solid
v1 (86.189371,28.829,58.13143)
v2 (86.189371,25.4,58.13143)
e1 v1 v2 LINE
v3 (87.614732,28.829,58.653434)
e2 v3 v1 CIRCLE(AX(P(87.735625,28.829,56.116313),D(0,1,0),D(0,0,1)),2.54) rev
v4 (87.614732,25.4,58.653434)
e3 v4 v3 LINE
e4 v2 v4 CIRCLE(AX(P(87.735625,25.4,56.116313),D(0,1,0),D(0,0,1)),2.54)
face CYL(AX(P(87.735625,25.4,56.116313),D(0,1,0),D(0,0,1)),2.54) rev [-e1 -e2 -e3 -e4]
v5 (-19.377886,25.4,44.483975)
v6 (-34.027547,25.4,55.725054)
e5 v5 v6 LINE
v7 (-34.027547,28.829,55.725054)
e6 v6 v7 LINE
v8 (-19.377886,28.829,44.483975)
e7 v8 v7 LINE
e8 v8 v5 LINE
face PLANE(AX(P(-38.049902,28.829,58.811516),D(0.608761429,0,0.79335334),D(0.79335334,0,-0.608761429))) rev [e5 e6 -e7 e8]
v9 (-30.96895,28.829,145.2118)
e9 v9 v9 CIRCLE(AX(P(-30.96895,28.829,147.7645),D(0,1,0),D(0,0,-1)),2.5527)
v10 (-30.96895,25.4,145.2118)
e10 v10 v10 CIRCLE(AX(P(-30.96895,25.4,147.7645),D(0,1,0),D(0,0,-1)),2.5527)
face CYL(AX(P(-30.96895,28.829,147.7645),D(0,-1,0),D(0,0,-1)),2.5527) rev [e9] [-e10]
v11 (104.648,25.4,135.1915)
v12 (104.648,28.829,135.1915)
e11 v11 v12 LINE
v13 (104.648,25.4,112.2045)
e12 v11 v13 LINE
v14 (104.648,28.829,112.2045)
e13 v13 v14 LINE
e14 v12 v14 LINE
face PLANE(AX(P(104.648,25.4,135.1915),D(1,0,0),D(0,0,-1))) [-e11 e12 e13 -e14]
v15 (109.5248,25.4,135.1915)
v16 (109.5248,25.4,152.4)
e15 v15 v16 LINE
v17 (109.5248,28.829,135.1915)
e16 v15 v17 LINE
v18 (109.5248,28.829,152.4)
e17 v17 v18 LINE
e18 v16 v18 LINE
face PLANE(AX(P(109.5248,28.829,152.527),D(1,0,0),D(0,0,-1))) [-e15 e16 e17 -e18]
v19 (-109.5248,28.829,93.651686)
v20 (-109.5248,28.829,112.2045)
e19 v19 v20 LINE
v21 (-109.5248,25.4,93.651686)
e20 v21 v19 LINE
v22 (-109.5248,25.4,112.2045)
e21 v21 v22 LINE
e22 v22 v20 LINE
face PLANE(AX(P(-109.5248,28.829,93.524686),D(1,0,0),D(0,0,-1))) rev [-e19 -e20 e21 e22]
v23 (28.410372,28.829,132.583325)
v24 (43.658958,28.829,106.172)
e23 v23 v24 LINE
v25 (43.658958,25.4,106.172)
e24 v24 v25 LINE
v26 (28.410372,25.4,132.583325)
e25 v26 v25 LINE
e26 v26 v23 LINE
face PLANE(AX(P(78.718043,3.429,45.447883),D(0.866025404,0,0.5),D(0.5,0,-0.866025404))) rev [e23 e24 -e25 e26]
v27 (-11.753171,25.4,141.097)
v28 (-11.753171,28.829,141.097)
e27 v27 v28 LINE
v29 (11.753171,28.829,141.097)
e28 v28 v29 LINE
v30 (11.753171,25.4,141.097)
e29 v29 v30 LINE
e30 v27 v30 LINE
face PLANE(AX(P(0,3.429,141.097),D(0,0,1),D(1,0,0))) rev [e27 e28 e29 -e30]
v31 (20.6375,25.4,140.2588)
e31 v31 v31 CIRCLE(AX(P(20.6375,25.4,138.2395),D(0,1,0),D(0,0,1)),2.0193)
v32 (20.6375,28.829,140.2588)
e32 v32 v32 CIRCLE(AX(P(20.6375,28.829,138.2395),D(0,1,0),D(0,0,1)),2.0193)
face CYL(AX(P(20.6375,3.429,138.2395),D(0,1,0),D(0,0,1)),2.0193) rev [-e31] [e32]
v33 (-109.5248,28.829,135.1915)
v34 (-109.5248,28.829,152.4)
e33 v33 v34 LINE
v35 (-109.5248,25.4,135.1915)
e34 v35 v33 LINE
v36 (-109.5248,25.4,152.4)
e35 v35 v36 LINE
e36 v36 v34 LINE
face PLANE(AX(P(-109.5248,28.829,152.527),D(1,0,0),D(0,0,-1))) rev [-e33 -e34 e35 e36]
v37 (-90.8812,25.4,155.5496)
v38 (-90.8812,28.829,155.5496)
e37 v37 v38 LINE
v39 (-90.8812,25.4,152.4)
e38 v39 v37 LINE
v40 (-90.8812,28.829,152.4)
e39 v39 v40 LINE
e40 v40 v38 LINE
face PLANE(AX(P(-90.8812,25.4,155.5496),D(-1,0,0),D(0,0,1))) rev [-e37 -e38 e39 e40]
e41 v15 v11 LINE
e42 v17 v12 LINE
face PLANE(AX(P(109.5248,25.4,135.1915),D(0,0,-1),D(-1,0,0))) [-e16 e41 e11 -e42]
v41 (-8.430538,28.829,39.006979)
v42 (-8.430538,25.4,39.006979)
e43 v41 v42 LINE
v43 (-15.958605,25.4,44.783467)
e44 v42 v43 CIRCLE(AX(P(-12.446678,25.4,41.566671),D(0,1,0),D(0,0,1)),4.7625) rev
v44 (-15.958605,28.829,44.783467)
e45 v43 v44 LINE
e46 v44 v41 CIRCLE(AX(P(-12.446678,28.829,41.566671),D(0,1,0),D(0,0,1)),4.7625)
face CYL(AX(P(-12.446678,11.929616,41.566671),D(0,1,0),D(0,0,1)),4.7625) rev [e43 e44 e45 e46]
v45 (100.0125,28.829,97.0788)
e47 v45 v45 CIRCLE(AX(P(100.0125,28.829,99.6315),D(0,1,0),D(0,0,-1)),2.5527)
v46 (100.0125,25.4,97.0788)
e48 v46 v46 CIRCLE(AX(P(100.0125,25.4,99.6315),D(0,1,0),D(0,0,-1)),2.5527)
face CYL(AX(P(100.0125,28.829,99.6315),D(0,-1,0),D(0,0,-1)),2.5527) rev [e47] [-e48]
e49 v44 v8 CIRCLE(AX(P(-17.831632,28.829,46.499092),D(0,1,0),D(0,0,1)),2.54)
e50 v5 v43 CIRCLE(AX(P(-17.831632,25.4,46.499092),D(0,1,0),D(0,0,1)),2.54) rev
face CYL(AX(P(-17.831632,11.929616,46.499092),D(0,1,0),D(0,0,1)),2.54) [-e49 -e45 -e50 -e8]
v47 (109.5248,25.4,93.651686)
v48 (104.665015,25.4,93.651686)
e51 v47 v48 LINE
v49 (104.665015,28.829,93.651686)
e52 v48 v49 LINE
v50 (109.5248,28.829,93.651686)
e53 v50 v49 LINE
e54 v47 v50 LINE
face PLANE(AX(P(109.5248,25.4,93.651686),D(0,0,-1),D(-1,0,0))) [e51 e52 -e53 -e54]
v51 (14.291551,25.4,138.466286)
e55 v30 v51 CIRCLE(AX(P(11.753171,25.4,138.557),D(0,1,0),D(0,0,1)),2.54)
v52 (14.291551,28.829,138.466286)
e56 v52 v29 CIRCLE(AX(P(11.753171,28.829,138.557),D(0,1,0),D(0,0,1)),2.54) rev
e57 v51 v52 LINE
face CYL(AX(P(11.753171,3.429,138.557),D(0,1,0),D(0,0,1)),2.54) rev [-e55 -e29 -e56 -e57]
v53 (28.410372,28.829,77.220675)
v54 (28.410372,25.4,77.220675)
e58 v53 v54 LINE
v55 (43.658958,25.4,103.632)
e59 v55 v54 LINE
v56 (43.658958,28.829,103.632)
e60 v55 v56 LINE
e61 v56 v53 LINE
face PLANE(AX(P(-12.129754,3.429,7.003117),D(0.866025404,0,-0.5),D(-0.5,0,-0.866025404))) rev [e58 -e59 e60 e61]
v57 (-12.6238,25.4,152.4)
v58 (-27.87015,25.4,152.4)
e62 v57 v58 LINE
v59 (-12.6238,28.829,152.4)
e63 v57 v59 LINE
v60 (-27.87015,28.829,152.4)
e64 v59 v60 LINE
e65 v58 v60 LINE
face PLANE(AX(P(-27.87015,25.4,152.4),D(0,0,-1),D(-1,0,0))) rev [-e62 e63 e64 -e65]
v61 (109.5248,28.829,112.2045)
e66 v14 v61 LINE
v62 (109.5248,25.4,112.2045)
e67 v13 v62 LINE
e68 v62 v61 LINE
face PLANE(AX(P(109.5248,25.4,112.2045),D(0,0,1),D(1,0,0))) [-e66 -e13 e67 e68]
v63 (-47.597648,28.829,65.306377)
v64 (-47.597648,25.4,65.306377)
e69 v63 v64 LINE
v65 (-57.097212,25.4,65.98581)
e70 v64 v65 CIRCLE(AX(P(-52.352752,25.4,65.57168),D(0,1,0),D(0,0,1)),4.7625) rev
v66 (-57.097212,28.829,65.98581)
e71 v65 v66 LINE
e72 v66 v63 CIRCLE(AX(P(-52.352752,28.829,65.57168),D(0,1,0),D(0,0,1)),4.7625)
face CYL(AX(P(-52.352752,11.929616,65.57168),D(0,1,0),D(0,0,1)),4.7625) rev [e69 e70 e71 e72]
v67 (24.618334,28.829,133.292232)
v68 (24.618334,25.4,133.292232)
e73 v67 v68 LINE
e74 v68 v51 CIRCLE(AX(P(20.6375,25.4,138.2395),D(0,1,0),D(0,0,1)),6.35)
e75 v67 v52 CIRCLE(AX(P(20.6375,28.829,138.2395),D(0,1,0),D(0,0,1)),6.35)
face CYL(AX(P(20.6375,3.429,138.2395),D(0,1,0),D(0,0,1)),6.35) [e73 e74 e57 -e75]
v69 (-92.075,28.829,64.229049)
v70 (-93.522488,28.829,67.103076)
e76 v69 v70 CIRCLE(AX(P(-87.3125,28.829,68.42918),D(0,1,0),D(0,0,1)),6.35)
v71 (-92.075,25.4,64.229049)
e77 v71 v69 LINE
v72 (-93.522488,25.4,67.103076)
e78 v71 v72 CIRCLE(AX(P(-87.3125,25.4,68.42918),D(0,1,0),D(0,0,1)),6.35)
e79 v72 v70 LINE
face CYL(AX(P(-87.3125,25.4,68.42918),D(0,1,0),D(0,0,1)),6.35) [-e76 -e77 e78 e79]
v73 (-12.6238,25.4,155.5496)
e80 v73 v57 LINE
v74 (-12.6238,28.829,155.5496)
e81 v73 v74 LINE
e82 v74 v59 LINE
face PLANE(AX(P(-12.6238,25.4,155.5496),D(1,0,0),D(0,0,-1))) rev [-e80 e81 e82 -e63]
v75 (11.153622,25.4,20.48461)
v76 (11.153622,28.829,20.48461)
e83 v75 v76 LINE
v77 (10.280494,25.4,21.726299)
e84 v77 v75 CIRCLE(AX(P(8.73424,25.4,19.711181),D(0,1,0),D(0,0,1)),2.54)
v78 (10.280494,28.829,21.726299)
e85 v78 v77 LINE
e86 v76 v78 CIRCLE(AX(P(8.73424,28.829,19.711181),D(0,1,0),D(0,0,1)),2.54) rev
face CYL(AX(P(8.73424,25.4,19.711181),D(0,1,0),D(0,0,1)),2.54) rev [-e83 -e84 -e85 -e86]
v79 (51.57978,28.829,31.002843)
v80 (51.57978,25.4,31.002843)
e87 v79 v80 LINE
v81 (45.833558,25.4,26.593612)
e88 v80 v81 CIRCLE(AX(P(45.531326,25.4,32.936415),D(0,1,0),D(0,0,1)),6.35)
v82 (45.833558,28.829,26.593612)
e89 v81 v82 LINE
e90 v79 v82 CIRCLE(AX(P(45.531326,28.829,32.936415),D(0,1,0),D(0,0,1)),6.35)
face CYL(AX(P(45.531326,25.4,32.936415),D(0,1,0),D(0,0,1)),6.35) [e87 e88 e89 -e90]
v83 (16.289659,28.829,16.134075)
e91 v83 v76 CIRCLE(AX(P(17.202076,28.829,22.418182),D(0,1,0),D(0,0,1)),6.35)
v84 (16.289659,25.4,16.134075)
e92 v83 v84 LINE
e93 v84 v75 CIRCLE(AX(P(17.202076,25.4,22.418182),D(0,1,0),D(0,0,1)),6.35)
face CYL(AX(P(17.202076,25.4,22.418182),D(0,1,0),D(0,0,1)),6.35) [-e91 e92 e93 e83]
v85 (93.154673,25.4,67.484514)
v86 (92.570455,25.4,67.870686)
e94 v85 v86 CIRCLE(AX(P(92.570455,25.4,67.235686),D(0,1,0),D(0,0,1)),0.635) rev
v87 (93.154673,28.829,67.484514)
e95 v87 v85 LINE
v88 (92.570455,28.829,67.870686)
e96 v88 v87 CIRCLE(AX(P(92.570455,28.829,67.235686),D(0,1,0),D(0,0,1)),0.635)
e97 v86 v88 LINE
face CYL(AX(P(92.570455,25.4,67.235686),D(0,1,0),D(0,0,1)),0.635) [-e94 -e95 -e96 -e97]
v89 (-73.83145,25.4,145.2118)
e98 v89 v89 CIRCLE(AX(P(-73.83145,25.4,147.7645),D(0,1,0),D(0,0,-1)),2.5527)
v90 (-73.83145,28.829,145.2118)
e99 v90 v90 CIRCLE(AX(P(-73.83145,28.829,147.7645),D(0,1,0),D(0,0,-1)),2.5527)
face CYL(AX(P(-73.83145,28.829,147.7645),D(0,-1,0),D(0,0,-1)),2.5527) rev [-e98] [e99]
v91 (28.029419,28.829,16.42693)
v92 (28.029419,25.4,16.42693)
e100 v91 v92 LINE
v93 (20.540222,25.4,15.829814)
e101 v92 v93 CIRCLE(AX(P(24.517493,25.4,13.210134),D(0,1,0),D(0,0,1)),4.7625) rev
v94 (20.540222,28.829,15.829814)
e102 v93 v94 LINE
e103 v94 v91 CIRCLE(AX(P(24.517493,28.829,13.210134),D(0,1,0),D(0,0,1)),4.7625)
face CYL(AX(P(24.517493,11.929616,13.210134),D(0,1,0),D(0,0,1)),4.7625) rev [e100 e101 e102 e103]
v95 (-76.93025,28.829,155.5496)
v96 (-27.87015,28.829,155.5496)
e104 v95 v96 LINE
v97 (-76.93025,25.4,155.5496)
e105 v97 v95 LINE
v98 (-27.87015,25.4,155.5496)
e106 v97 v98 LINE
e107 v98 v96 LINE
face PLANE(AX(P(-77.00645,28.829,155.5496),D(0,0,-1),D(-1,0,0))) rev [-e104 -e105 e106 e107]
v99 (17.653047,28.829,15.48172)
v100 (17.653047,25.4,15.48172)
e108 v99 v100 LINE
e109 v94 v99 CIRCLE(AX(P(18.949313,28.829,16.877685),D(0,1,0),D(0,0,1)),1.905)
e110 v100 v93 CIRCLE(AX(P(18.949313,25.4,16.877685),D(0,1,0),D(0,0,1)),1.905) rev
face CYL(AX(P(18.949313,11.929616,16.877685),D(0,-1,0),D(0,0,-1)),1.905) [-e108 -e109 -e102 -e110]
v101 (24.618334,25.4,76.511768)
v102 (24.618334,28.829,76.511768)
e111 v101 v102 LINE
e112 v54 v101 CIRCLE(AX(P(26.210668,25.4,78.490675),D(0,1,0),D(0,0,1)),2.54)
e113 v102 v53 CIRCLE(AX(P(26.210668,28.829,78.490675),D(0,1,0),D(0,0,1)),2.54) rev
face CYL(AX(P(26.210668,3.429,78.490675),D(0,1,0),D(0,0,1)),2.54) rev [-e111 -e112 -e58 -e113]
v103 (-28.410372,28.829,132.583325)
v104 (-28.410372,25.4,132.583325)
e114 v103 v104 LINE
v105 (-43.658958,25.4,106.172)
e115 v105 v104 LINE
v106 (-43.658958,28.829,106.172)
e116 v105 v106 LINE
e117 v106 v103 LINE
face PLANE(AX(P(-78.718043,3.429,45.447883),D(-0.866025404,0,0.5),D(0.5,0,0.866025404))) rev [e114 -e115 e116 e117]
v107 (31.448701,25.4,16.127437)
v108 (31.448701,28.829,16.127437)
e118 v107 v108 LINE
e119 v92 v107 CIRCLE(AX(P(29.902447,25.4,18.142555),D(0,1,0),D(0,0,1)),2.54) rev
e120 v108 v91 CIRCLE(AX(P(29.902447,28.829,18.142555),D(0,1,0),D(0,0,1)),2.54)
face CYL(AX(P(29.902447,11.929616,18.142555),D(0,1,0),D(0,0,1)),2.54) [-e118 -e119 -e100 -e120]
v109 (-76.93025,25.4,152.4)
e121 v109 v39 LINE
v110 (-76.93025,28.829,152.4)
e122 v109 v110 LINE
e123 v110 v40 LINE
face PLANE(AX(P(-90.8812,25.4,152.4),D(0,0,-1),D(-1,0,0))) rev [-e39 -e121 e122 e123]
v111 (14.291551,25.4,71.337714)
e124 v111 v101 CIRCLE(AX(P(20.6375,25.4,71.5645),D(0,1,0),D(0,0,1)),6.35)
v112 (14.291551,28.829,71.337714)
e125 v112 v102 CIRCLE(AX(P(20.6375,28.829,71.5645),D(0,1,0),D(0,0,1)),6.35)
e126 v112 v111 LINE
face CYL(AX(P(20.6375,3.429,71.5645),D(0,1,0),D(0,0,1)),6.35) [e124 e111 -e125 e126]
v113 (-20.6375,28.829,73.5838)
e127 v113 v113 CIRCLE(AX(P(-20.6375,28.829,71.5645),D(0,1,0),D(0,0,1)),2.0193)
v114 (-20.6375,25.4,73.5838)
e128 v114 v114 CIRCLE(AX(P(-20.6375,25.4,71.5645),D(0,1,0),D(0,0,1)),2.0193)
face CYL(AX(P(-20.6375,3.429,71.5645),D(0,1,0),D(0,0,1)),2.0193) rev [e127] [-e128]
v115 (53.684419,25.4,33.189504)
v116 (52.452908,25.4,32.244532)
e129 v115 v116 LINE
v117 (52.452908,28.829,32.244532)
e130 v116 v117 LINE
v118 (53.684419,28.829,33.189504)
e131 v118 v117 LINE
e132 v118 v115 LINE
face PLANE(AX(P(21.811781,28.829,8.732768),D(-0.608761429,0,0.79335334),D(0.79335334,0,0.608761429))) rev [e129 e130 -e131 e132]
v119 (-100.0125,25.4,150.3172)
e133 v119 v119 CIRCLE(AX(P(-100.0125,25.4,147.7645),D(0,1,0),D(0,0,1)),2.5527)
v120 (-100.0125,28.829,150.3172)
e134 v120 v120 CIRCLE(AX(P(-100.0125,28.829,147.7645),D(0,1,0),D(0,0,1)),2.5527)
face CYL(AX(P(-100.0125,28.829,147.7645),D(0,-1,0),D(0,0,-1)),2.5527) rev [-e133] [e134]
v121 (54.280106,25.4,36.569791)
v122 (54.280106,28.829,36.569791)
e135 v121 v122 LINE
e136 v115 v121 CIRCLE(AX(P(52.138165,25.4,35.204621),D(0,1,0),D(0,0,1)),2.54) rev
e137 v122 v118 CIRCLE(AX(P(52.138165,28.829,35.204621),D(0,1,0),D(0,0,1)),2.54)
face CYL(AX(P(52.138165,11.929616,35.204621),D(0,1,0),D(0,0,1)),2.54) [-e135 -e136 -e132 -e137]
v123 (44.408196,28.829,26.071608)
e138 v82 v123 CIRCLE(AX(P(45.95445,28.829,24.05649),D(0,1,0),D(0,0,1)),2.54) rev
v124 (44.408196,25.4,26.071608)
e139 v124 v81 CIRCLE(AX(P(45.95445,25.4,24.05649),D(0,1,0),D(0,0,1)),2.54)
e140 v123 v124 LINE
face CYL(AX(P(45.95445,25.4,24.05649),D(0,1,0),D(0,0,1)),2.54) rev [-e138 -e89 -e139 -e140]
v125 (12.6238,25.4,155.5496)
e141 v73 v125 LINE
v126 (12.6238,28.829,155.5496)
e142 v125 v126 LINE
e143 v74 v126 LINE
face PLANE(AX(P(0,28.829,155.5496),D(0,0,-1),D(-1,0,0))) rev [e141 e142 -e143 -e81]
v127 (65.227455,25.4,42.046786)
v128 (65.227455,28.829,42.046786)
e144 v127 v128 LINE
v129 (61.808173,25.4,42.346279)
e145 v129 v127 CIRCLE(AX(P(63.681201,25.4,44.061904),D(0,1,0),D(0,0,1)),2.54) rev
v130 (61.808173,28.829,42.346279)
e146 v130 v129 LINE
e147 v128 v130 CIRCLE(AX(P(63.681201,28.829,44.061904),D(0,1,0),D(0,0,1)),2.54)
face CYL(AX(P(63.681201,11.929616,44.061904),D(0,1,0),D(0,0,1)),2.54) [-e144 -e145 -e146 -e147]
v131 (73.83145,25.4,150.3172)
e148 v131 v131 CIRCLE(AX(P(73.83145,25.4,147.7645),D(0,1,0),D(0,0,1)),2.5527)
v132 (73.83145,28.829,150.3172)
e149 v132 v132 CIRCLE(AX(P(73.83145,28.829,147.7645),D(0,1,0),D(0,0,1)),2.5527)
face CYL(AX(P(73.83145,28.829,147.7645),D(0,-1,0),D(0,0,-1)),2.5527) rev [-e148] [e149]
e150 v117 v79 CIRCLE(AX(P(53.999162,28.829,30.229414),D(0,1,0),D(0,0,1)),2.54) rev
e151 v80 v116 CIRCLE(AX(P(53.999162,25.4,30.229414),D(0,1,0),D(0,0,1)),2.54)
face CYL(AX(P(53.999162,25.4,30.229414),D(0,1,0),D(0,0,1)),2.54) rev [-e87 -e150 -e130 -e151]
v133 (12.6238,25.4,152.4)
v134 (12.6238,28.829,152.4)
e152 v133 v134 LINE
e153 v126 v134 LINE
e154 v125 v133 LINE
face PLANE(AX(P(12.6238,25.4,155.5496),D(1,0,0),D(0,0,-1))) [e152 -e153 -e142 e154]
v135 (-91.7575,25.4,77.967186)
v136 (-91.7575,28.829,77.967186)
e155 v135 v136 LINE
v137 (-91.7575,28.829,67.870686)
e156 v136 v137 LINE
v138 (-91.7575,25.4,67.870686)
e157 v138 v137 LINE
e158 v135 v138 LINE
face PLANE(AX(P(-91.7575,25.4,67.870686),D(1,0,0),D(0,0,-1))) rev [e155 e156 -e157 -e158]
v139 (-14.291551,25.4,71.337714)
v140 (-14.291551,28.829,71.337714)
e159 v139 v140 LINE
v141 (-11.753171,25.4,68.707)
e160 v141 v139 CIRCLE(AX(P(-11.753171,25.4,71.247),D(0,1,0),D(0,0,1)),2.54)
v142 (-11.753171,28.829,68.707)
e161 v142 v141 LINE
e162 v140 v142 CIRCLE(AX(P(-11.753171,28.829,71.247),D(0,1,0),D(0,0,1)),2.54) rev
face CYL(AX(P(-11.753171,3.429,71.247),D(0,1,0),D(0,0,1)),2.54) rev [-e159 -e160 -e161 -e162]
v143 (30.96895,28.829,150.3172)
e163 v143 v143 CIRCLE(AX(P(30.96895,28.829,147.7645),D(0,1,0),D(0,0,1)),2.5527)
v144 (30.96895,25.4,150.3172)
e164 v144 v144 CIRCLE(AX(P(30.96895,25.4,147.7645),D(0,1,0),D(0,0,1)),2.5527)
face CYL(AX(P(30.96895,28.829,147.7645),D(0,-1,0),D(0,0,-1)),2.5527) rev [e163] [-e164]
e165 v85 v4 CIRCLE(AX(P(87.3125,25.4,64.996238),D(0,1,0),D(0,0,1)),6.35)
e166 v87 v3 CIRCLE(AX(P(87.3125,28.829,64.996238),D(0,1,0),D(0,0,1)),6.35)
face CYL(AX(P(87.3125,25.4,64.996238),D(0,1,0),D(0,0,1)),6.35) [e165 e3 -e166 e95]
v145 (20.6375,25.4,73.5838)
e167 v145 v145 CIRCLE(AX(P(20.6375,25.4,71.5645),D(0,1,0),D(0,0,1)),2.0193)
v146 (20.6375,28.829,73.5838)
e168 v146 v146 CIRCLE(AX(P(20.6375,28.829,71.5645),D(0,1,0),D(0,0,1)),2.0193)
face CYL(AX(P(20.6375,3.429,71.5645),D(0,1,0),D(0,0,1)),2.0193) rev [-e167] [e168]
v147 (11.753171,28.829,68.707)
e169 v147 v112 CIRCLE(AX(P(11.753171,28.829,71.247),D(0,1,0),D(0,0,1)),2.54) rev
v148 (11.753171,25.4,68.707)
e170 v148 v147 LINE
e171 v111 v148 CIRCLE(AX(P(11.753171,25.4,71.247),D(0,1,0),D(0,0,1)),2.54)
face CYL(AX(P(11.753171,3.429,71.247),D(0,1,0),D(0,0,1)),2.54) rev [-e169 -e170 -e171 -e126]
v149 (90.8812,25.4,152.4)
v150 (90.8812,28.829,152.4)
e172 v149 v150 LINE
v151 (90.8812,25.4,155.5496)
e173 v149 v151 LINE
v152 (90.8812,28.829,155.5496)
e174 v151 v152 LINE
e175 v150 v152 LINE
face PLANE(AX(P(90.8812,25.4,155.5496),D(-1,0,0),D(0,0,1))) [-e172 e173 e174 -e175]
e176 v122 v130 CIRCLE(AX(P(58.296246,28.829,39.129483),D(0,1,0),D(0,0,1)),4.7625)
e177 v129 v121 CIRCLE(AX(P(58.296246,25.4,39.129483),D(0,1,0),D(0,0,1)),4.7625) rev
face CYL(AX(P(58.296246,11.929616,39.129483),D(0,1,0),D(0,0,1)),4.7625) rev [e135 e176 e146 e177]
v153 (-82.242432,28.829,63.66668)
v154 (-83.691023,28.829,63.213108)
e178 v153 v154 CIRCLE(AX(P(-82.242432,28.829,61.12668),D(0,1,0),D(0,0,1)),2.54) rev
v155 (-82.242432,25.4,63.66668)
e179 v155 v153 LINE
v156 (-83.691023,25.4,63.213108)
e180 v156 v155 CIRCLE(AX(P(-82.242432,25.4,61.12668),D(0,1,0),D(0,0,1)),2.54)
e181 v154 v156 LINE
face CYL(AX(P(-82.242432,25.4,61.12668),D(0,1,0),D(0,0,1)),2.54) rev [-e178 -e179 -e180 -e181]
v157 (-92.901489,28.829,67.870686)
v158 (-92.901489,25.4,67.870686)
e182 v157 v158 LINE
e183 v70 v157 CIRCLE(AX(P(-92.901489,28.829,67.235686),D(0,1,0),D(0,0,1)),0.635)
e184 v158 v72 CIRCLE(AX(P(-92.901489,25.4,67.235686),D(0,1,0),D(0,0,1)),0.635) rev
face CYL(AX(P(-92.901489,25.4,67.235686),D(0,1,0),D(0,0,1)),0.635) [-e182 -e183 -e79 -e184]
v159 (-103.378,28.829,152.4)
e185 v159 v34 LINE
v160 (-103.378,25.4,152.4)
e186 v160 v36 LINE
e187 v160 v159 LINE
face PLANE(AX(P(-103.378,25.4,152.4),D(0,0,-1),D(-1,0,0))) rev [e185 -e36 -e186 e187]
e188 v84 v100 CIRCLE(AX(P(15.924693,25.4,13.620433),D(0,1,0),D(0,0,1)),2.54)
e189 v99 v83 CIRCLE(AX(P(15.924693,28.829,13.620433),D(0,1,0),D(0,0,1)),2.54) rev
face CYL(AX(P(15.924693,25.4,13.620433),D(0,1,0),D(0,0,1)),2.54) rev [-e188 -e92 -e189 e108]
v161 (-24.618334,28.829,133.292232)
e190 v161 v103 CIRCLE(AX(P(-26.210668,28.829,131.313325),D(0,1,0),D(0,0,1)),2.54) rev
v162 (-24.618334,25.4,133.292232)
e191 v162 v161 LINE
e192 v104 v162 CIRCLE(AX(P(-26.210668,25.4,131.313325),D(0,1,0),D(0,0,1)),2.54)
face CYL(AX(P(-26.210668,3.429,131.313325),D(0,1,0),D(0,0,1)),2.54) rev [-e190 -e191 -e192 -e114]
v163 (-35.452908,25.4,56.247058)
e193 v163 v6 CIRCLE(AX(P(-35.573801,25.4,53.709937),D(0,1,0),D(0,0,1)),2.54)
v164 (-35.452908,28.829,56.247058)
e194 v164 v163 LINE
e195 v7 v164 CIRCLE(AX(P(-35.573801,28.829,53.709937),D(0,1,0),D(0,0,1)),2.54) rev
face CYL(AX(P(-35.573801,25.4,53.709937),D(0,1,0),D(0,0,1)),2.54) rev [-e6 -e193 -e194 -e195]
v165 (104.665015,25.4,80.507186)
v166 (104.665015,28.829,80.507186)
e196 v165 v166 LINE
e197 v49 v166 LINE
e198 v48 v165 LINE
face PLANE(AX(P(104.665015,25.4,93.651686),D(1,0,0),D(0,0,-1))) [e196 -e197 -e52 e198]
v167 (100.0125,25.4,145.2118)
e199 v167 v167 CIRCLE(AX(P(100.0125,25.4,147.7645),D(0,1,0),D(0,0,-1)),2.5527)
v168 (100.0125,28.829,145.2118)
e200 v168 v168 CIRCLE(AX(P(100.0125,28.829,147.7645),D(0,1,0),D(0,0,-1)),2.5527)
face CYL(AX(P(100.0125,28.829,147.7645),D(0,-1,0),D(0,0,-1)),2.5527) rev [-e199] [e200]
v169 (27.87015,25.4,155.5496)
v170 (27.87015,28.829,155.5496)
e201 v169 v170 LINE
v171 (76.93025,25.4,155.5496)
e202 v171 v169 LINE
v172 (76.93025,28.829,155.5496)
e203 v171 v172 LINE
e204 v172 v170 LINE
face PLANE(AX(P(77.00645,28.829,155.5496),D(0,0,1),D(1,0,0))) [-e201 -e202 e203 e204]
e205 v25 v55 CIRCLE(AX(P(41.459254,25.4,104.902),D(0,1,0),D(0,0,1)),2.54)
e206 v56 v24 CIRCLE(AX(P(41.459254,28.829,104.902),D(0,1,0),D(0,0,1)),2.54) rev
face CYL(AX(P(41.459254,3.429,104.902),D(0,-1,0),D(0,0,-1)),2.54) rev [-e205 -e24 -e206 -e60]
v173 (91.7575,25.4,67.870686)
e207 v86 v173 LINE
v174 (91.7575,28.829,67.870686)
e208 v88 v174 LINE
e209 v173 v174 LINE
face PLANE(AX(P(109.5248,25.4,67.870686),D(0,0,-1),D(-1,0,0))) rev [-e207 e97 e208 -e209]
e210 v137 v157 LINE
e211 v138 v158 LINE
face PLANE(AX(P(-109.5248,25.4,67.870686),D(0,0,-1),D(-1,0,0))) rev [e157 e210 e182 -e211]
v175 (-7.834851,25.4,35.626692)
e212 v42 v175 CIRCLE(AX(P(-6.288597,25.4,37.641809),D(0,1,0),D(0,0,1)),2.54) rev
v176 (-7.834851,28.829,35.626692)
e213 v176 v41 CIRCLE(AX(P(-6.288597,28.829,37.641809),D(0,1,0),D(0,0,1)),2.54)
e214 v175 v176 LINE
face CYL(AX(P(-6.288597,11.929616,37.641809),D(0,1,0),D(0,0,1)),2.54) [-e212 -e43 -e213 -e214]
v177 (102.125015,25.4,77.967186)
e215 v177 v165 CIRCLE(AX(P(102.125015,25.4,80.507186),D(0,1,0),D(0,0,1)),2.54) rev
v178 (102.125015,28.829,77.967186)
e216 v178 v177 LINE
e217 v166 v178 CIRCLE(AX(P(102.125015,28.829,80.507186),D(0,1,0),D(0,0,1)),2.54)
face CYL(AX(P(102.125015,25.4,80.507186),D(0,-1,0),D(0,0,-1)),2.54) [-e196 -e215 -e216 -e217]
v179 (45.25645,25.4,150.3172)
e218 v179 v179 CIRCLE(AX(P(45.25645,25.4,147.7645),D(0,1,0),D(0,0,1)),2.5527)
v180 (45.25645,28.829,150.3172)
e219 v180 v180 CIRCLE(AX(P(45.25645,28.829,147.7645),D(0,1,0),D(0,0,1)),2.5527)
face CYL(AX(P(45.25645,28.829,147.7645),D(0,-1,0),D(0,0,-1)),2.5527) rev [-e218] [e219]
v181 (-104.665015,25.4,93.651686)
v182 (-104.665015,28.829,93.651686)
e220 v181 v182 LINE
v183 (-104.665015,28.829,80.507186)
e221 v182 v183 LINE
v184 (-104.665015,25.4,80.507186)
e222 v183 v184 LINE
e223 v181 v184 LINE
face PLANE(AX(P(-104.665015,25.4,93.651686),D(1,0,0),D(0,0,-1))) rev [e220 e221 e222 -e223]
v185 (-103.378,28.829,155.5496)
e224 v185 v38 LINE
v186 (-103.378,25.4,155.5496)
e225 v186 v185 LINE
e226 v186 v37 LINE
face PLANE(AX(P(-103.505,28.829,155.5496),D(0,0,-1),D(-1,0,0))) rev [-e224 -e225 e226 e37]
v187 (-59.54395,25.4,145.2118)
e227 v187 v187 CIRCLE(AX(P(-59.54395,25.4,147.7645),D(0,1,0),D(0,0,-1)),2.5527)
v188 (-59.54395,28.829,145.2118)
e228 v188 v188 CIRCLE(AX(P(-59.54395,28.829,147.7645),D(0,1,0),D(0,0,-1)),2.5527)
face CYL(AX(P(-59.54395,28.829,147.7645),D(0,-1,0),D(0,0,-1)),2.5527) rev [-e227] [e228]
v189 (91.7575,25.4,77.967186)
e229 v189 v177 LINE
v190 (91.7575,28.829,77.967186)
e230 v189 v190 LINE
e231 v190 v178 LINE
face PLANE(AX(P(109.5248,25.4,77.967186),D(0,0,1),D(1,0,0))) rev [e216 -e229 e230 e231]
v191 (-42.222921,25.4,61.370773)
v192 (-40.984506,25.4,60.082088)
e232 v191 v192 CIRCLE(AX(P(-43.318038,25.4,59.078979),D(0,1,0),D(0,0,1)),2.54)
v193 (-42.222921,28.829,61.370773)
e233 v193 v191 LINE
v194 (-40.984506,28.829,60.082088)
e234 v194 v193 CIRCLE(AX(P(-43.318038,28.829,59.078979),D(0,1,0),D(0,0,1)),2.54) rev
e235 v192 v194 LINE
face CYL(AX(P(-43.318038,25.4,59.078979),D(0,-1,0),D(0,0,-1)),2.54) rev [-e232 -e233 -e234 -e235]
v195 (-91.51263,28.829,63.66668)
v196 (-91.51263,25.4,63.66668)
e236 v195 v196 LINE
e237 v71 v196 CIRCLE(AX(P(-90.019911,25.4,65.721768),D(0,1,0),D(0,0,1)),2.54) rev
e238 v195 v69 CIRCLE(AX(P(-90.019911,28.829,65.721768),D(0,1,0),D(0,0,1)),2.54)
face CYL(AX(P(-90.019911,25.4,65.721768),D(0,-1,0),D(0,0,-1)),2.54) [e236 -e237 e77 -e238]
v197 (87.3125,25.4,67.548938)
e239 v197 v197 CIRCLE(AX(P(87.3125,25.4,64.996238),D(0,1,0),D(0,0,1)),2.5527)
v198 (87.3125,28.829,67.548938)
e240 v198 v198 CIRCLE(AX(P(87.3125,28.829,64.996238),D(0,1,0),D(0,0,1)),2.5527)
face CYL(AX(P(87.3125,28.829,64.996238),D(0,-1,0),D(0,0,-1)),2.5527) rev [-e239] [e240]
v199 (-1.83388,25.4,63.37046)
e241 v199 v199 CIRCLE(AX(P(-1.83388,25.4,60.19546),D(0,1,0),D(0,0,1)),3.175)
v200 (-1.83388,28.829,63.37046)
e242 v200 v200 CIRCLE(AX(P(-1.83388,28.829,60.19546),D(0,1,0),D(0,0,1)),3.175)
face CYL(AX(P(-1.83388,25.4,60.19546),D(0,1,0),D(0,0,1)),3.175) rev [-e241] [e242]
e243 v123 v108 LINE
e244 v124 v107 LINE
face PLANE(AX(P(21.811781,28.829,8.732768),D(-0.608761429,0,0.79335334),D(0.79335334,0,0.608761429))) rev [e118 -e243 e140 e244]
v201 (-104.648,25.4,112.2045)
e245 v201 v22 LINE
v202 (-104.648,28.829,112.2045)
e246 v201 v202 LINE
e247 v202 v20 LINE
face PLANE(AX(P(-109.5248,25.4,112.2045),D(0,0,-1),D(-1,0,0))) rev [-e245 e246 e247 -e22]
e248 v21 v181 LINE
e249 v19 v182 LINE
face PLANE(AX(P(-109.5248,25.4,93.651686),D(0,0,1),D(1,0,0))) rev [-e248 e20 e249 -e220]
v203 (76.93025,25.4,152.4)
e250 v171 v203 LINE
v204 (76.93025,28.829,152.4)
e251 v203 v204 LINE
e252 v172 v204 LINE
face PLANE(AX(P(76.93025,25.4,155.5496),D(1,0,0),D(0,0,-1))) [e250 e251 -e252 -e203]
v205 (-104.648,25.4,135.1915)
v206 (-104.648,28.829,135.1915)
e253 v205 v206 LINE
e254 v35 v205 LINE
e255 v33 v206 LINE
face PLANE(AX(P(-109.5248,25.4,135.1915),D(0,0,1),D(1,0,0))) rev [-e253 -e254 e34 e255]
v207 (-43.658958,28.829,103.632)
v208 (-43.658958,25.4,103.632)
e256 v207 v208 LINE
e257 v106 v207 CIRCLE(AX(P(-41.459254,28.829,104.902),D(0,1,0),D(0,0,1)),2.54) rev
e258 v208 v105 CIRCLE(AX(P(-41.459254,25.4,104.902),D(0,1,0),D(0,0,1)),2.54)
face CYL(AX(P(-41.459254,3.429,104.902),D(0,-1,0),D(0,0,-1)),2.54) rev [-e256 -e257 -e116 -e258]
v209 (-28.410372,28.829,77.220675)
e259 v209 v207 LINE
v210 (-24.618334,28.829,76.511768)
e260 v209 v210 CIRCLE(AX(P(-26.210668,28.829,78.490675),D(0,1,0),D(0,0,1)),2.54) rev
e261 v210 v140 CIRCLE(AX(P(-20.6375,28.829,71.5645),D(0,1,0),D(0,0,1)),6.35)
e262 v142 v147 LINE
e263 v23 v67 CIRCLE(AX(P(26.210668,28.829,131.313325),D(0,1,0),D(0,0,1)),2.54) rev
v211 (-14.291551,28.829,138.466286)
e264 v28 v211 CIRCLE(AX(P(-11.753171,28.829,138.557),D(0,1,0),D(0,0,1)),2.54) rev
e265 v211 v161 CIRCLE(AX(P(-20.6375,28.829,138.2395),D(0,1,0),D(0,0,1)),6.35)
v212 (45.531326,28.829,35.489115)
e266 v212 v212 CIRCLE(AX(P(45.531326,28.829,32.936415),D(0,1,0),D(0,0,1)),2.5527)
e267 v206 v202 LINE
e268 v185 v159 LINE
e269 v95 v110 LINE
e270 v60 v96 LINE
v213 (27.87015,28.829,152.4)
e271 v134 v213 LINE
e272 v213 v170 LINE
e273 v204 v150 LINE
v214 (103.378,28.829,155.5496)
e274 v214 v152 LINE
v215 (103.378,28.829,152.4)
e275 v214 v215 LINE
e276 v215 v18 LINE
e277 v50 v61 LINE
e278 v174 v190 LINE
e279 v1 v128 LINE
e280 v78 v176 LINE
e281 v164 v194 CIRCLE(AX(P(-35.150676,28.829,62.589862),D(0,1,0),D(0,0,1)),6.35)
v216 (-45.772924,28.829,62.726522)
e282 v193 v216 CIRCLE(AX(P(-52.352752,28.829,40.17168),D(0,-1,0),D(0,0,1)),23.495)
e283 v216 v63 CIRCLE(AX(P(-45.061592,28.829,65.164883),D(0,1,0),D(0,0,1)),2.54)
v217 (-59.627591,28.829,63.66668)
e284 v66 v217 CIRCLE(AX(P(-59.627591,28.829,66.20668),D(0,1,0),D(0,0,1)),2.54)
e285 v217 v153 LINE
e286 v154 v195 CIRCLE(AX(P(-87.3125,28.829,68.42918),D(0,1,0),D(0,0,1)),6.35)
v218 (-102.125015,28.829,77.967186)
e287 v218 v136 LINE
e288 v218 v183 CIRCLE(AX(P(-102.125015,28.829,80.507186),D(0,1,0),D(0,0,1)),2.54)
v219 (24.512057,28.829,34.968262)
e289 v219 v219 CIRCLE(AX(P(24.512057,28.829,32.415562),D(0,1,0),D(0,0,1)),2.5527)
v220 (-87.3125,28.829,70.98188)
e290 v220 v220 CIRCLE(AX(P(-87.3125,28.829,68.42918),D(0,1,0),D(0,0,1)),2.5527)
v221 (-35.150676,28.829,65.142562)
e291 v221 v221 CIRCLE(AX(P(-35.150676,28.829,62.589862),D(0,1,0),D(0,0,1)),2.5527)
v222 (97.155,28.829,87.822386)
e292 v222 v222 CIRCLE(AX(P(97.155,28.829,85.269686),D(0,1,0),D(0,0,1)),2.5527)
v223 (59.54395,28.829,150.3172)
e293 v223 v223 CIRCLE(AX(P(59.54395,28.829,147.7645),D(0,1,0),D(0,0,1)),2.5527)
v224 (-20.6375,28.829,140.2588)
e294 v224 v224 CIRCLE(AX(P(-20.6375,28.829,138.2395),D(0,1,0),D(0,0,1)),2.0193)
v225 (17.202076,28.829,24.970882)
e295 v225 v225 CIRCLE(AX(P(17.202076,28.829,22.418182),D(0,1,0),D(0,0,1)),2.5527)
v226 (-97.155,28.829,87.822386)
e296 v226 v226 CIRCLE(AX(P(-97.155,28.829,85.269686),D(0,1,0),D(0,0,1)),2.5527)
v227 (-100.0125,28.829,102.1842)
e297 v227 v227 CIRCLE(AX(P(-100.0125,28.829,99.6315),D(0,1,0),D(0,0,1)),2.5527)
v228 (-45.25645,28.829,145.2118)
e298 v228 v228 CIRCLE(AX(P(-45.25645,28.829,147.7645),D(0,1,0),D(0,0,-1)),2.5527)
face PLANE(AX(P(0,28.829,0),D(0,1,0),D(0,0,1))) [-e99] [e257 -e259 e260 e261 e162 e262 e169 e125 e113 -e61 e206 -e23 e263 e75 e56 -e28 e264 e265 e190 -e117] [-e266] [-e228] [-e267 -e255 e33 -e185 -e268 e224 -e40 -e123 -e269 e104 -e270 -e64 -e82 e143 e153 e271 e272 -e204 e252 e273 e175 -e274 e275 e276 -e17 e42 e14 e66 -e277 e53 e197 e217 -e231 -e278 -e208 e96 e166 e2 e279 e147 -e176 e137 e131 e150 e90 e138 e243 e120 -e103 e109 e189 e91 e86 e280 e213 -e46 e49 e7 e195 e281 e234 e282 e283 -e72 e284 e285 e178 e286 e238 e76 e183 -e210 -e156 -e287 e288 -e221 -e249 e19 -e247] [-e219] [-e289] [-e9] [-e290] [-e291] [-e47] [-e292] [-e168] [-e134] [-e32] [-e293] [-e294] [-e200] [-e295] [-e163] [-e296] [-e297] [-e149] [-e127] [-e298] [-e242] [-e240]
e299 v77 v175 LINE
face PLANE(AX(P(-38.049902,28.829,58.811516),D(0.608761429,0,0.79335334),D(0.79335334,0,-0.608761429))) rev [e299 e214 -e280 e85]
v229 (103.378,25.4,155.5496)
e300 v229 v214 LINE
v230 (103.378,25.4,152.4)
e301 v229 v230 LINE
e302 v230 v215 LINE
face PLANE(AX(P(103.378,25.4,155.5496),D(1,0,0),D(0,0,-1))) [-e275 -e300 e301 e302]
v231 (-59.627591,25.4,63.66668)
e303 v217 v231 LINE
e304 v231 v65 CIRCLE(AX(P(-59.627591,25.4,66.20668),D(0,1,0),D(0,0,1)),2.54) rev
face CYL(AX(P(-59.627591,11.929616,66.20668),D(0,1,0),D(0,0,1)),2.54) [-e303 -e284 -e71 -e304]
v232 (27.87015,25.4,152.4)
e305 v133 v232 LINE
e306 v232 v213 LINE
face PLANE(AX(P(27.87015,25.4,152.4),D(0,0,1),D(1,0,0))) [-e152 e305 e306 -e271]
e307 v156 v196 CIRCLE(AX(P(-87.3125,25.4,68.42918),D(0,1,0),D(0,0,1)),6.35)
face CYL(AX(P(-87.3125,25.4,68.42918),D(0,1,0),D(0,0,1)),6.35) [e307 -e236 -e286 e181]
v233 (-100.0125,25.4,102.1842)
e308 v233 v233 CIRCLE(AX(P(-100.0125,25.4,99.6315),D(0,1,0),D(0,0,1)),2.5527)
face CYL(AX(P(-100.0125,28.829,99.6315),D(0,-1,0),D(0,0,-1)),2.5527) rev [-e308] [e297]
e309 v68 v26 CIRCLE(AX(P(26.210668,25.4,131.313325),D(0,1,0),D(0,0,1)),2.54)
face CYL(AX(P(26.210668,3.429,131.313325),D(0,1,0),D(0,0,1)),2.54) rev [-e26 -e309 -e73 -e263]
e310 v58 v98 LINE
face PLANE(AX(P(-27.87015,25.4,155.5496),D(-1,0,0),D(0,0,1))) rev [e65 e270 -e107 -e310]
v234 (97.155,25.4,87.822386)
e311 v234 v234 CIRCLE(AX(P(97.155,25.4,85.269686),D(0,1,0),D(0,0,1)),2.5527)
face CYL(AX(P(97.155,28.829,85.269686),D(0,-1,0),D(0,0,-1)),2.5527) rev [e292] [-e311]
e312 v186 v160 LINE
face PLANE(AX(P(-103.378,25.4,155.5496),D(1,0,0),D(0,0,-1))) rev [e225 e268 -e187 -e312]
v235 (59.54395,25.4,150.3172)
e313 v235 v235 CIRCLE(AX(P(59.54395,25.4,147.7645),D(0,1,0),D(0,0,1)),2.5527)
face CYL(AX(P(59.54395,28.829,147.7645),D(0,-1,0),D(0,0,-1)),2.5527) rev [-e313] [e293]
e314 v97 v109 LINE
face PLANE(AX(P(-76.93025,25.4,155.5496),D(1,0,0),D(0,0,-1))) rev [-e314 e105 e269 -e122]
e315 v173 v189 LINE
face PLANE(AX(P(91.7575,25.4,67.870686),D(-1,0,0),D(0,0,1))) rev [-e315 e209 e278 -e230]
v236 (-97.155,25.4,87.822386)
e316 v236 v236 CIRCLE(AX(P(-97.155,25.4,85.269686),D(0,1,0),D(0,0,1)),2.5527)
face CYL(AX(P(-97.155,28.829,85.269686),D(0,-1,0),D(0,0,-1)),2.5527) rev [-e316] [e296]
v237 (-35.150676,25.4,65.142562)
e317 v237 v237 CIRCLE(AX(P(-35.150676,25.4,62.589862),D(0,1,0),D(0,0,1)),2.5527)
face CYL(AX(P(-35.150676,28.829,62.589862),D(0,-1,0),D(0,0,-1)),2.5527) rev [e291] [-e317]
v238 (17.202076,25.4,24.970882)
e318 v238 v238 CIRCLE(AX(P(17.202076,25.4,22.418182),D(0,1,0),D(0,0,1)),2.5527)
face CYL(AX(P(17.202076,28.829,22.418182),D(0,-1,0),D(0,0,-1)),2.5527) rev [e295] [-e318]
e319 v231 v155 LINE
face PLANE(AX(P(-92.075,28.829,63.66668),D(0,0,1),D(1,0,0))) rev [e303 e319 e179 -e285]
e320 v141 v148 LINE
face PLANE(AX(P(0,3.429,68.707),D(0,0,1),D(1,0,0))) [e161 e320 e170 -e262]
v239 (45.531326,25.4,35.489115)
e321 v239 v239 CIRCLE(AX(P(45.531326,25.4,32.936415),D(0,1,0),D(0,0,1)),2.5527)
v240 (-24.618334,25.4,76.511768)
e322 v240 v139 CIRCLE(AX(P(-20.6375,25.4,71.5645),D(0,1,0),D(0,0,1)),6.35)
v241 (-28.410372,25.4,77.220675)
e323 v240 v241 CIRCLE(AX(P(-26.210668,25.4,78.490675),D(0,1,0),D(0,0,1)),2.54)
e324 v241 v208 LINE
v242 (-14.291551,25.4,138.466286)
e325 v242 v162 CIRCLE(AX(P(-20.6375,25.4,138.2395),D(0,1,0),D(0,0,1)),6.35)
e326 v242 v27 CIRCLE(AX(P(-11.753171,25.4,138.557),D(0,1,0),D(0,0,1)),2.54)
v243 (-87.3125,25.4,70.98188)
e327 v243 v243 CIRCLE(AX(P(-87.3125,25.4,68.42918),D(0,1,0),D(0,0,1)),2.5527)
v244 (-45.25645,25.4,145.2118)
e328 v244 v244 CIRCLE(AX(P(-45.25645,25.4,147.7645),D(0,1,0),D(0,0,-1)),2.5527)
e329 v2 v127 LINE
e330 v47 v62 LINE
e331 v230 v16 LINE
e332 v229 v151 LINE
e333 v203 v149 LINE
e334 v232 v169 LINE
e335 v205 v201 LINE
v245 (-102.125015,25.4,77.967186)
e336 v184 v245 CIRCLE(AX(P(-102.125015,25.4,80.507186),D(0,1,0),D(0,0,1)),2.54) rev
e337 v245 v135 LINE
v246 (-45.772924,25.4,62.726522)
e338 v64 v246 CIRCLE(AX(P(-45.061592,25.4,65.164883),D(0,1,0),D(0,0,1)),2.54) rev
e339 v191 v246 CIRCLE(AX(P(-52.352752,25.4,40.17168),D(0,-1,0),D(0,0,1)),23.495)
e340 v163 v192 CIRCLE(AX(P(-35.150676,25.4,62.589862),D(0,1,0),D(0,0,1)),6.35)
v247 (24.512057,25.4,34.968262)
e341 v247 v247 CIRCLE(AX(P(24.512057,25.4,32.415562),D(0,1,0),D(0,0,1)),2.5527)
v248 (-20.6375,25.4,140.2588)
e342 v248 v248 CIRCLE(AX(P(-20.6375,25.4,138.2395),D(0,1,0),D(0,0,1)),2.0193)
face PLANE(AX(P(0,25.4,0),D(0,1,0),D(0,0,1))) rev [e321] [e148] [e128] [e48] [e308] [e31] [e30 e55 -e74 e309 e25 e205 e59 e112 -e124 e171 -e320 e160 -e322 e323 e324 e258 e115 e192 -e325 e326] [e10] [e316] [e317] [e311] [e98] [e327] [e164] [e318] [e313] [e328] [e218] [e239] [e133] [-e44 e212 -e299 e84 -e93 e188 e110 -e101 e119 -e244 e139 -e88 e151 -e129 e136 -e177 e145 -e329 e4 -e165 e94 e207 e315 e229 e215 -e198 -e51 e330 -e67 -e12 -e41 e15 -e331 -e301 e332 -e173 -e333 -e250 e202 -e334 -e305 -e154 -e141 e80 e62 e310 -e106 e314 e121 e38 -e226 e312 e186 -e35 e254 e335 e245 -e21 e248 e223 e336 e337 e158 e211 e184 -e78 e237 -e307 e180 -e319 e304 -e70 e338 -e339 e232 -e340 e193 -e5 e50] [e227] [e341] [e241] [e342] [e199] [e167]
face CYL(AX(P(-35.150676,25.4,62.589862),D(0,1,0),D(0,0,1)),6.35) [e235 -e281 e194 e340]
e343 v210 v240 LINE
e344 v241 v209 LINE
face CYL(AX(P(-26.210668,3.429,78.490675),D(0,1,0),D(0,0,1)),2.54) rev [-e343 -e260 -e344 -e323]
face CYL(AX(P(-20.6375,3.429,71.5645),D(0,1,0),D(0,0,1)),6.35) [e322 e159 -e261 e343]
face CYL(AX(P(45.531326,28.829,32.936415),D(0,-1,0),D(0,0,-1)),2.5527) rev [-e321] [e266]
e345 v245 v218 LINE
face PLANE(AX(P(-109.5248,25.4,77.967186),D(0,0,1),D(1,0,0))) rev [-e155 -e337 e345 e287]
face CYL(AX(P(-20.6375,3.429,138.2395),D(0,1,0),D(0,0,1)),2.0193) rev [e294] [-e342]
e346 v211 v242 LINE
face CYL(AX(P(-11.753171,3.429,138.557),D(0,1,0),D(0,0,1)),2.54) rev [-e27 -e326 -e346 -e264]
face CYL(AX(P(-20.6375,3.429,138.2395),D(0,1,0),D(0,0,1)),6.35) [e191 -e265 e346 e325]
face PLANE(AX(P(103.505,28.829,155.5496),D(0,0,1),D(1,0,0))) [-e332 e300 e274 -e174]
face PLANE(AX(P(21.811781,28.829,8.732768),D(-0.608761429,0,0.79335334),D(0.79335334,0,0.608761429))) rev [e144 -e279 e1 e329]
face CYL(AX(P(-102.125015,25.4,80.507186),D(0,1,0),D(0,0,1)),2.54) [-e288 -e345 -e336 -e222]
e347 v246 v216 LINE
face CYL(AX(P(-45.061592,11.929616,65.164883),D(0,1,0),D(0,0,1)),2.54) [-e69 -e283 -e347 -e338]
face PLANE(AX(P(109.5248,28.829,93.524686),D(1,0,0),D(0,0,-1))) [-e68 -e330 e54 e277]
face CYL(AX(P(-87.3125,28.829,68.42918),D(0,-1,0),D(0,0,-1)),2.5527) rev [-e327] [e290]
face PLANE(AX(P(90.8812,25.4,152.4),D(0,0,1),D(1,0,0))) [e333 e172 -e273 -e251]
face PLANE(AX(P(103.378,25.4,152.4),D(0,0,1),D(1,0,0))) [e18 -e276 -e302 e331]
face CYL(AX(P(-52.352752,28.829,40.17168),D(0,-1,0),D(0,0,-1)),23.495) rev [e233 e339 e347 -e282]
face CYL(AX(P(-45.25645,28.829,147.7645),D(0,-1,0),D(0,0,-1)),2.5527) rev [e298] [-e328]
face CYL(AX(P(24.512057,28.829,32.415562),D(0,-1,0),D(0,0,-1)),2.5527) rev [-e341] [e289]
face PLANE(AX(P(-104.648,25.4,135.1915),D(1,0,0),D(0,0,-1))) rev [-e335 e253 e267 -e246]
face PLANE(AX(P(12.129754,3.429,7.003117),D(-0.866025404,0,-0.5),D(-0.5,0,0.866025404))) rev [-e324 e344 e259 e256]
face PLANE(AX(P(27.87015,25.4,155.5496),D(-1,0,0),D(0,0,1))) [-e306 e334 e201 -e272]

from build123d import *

# Parameters (mm, degrees)
SKETCH44_R              = 2.5527
TOP_PLATE_EXTRUDE_DEPTH = 3.429
SKETCH82_R              = 4.7625
CUT_EXTRUDE38_DEPTH     = 3.429
SKETCH72_W              = 4.7498
SKETCH72_H              = 17.4625
SKETCH72_W_2            = 49.2125
SKETCH72_H_2            = 3.0226
SKETCH72_H_3            = 18.806813894
SKETCH72_W_3            = 12.7
SKETCH72_H_4            = 9.525
BOSS_EXTRUDE27_DEPTH    = 3.429
SKETCH86_R              = 6.35
SKETCH86_R_2            = 2.5527
BOSS_EXTRUDE31_DEPTH    = 3.429
SKETCH111_W             = 17.7673
SKETCH111_H             = 10.0965
CUT_EXTRUDE57_DEPTH     = 191.27116943
SKETCH92_W              = 4.859785226
SKETCH92_H              = 15.6845
SKETCH92_W_2            = 4.8768
SKETCH92_H_2            = 22.987
SKETCH92_W_3            = 6.1468
SKETCH92_H_3            = 3.1496
SKETCH92_W_4            = 13.95095
SKETCH92_W_5            = 15.24635
CUT_EXTRUDE44_DEPTH     = 191.27116943
SKETCH95_R              = 2.0193
CUT_EXTRUDE47_DEPTH     = 25.4
SKETCH99_R              = 3.175
CUT_EXTRUDE50_DEPTH     = 191.27116943
FILLET5_R               = 2.54
FILLET6_R               = 2.54
FILLET7_R               = 2.54
FILLET8_R               = 1.905
FILLET42_R              = 0.635


with BuildPart() as part:
    # Sketch44 → Top Plate Extrude----------- (new body)
    with BuildSketch(Plane(origin=(0, 25.4, 0), x_dir=(1, 0, 0), z_dir=(0, 1, 0))):
        with BuildLine():
            Line((-104.775, -68.124686106), (-104.775, -152.527))
            Line((-104.775, -152.527), (104.775, -152.527))
            Line((104.775, -152.527), (104.775, -68.124686106))
            Line((104.775, -68.124686106), (92.075, -68.124686106))
            Line((92.075, -68.124686106), (92.075, -62.647632589))
            Line((92.075, -62.647632589), (21.81178084, -8.732768266))
            ThreePointArc((21.81178084, -8.732768266), (18.724426226, -14.191930366), (14.302849775, -18.63983673))
            Line((14.302849775, -18.63983673), (-38.049902469, -58.811516421))
            ThreePointArc((-38.049902469, -58.811516421), (-44.800532006, -62.419803084), (-52.352752243, -63.666679691))
            Line((-52.352752243, -63.666679691), (-92.075, -63.666679691))
            Line((-92.075, -63.666679691), (-92.075, -68.124686106))
            Line((-92.075, -68.124686106), (-104.775, -68.124686106))
        make_face()
        with Locations(Location((-73.83145, -147.7645, 0), (0, 0, 90))):
            Circle(SKETCH44_R, mode=Mode.SUBTRACT)
        with Locations(Location((-59.54395, -147.7645, 0), (0, 0, 90))):
            Circle(SKETCH44_R, mode=Mode.SUBTRACT)
        with Locations(Location((-45.25645, -147.7645, 0), (0, 0, 90))):
            Circle(SKETCH44_R, mode=Mode.SUBTRACT)
        with Locations(Location((-30.96895, -147.7645, 0), (0, 0, 90))):
            Circle(SKETCH44_R, mode=Mode.SUBTRACT)
        with Locations(Location((-100.0125, -99.6315, 0), (0, 0, 270))):
            Circle(SKETCH44_R, mode=Mode.SUBTRACT)
        with Locations(Location((-100.0125, -147.7645, 0), (0, 0, 270))):
            Circle(SKETCH44_R, mode=Mode.SUBTRACT)
        with Locations(Location((100.0125, -147.7645, 0), (0, 0, 90))):
            Circle(SKETCH44_R, mode=Mode.SUBTRACT)
        with Locations(Location((100.0125, -99.6315, 0), (0, 0, 90))):
            Circle(SKETCH44_R, mode=Mode.SUBTRACT)
        with Locations(Location((30.96895, -147.7645, 0), (0, 0, 270))):
            Circle(SKETCH44_R, mode=Mode.SUBTRACT)
        with Locations(Location((45.25645, -147.7645, 0), (0, 0, 270))):
            Circle(SKETCH44_R, mode=Mode.SUBTRACT)
        with Locations(Location((59.54395, -147.7645, 0), (0, 0, 270))):
            Circle(SKETCH44_R, mode=Mode.SUBTRACT)
        with Locations(Location((73.83145, -147.7645, 0), (0, 0, 270))):
            Circle(SKETCH44_R, mode=Mode.SUBTRACT)
        with Locations(Location((-87.3125, -68.429179691, 0), (0, 0, 270))):
            Circle(SKETCH44_R, mode=Mode.SUBTRACT)
        with Locations(Location((-35.150676163, -62.589861704, 0), (0, 0, 270))):
            Circle(SKETCH44_R, mode=Mode.SUBTRACT)
        with Locations(Location((17.20207608, -22.418182013, 0), (0, 0, 270))):
            Circle(SKETCH44_R, mode=Mode.SUBTRACT)
        with Locations(Location((45.531325629, -32.936414996, 0), (0, 0, 270))):
            Circle(SKETCH44_R, mode=Mode.SUBTRACT)
        with Locations(Location((87.3125, -64.996237681, 0), (0, 0, 270))):
            Circle(SKETCH44_R, mode=Mode.SUBTRACT)
        with Locations(Location((-97.155, -85.269686106, 0), (0, 0, 270))):
            Circle(SKETCH44_R, mode=Mode.SUBTRACT)
        with Locations(Location((24.512056641, -32.4155623, 0), (0, 0, 270))):
            Circle(SKETCH44_R, mode=Mode.SUBTRACT)
        with Locations(Location((97.155, -85.269686106, 0), (0, 0, 270))):
            Circle(SKETCH44_R, mode=Mode.SUBTRACT)
    extrude(amount=TOP_PLATE_EXTRUDE_DEPTH)

    # Sketch82 → Cut-Extrude38 (cut)
    with BuildSketch(Plane(origin=(0, 28.829, 0), x_dir=(1, 0, 0), z_dir=(0, 1, 0))):
        with Locations((-52.352752243, -65.571679691)):
            Circle(SKETCH82_R)
        with Locations((-12.44667807, -41.56667131)):
            Circle(SKETCH82_R)
        with Locations((58.296246284, -39.129483192)):
            Circle(SKETCH82_R)
        with BuildLine():
            Line((21.464274093, -9.555101394), (21.81178084, -8.732768266))
            Line((21.81178084, -8.732768266), (22.214272521, -9.041610995))
            ThreePointArc((22.214272521, -9.041610995), (27.20799018, -17.139845005), (21.464274093, -9.555101394))
        make_face()
    extrude(amount=-CUT_EXTRUDE38_DEPTH, mode=Mode.SUBTRACT)

    # Sketch72 → Boss-Extrude27 (add, through all)
    with BuildSketch(Plane(origin=(0, 25.4, 0), x_dir=(1, 0, 0), z_dir=(0, 1, 0))):
        with Locations((-107.1499, -143.79575)):
            Rectangle(SKETCH72_W, SKETCH72_H)
        with Locations((-52.4002, -154.0383)):
            Rectangle(SKETCH72_W_2, SKETCH72_H_2)
        with Locations((-107.1499, -102.928093053)):
            Rectangle(SKETCH72_W, SKETCH72_H_3)
        with Locations((-6.35, -154.0383)):
            Rectangle(SKETCH72_W_3, SKETCH72_H_2)
        with Locations((-107.1499, -72.887186106)):
            Rectangle(SKETCH72_W, SKETCH72_H_4)
        with Locations((-97.155, -154.0383)):
            Rectangle(SKETCH72_W_3, SKETCH72_H_2)
    boss_extrude27 = extrude(amount=BOSS_EXTRUDE27_DEPTH)

    # Mirror22: Boss-Extrude27 across plane
    add(boss_extrude27.mirror(Plane(origin=(0, 0, 0), x_dir=(0, 0, 1), z_dir=(1, 0, 0))))

    # Sketch86 → Boss-Extrude31 (add, through all)
    # profile 1 of 5: a face of its own
    with BuildSketch(Plane(origin=(0, 28.829, 0), x_dir=(1, 0, 0), z_dir=(0, 1, 0))):
        with Locations((87.3125, -64.996237681)):
            Circle(SKETCH86_R)
        with Locations(Location((87.3125, -64.996237681, 0), (0, 0, 270))):
            Circle(SKETCH86_R_2, mode=Mode.SUBTRACT)
    # profile 2 of 5: a face of its own
    with BuildSketch(Plane(origin=(0, 28.829, 0), x_dir=(1, 0, 0), z_dir=(0, 1, 0))):
        with Locations((17.20207608, -22.418182013)):
            Circle(SKETCH86_R)
        with Locations(Location((17.20207608, -22.418182013, 0), (0, 0, 270))):
            Circle(SKETCH86_R_2, mode=Mode.SUBTRACT)
    # profile 3 of 5: a face of its own
    with BuildSketch(Plane(origin=(0, 28.829, 0), x_dir=(1, 0, 0), z_dir=(0, 1, 0))):
        with Locations((45.531325629, -32.936414996)):
            Circle(SKETCH86_R)
        with Locations(Location((45.531325629, -32.936414996, 0), (0, 0, 270))):
            Circle(SKETCH86_R_2, mode=Mode.SUBTRACT)
    # profile 4 of 5: a face of its own
    with BuildSketch(Plane(origin=(0, 28.829, 0), x_dir=(1, 0, 0), z_dir=(0, 1, 0))):
        with Locations((-35.150676163, -62.589861704)):
            Circle(SKETCH86_R)
        with Locations(Location((-35.150676163, -62.589861704, 0), (0, 0, 270))):
            Circle(SKETCH86_R_2, mode=Mode.SUBTRACT)
    # profile 5 of 5: a face of its own
    with BuildSketch(Plane(origin=(0, 28.829, 0), x_dir=(1, 0, 0), z_dir=(0, 1, 0))):
        with Locations((-87.3125, -68.429179691)):
            Circle(SKETCH86_R)
        with Locations(Location((-87.3125, -68.429179691, 0), (0, 0, 270))):
            Circle(SKETCH86_R_2, mode=Mode.SUBTRACT)
    extrude(amount=-BOSS_EXTRUDE31_DEPTH)

    # Sketch111 → Cut-Extrude57 (cut, through all)
    with BuildSketch(Plane(origin=(0, 28.829, 0), x_dir=(1, 0, 0), z_dir=(0, 1, 0))):
        with Locations((-100.64115, -72.918936106)):
            Rectangle(SKETCH111_W, SKETCH111_H)
        with Locations((100.64115, -72.918936106)):
            Rectangle(SKETCH111_W, SKETCH111_H)
    extrude(amount=-CUT_EXTRUDE57_DEPTH, mode=Mode.SUBTRACT)

    # Sketch92 → Cut-Extrude44 (cut, through all)
    with BuildSketch(Plane(origin=(0, 28.829, 0), x_dir=(1, 0, 0), z_dir=(0, 1, 0))):
        with Locations((-107.094907387, -85.809436106)):
            Rectangle(SKETCH92_W, SKETCH92_H)
        with Locations((-107.0864, -123.698)):
            Rectangle(SKETCH92_W_2, SKETCH92_H_2)
        with Locations((-106.4514, -153.9748)):
            Rectangle(SKETCH92_W_3, SKETCH92_H_3)
        with Locations((-83.905725, -153.9748)):
            Rectangle(SKETCH92_W_4, SKETCH92_H_3)
        with Locations((-20.246975, -153.9748)):
            Rectangle(SKETCH92_W_5, SKETCH92_H_3)
    cut_extrude44 = extrude(amount=-CUT_EXTRUDE44_DEPTH, mode=Mode.SUBTRACT)

    # Mirror26: Cut-Extrude44 across plane
    add(cut_extrude44.mirror(Plane(origin=(0, 0, 0), x_dir=(0, 0, 1), z_dir=(1, 0, 0))), mode=Mode.SUBTRACT)

    # Sketch95 → Cut-Extrude47 (cut)
    with BuildSketch(Plane(origin=(0, 28.829, 0), x_dir=(1, 0, 0), z_dir=(0, 1, 0))):
        with BuildLine():
            Line((-14.966768676, -141.097), (14.966768676, -141.097))
            ThreePointArc((14.966768676, -141.097), (18.013644543, -132.45695017), (26.522246674, -135.853654954))
            Line((26.522246674, -135.853654954), (44.392192993, -104.902))
            Line((44.392192993, -104.902), (26.522246674, -73.950345046))
            ThreePointArc((26.522246674, -73.950345046), (18.013644543, -77.34704983), (14.966768676, -68.707))
            Line((14.966768676, -68.707), (-14.966768676, -68.707))
            ThreePointArc((-14.966768676, -68.707), (-18.013644543, -77.34704983), (-26.522246674, -73.950345046))
            Line((-26.522246674, -73.950345046), (-44.392192993, -104.902))
            Line((-44.392192993, -104.902), (-26.522246674, -135.853654954))
            ThreePointArc((-26.522246674, -135.853654954), (-18.013644543, -132.45695017), (-14.966768676, -141.097))
        make_face()
        with Locations(Location((-20.6375, -71.5645, 0), (0, 0, 270))):
            Circle(SKETCH95_R)
        with Locations(Location((20.6375, -71.5645, 0), (0, 0, 270))):
            Circle(SKETCH95_R)
        with Locations(Location((20.6375, -138.2395, 0), (0, 0, 270))):
            Circle(SKETCH95_R)
        with Locations(Location((-20.6375, -138.2395, 0), (0, 0, 270))):
            Circle(SKETCH95_R)
    extrude(amount=-CUT_EXTRUDE47_DEPTH, mode=Mode.SUBTRACT)

    # Sketch99 → Cut-Extrude50 (cut, through all)
    with BuildSketch(Plane(origin=(0, 28.829, 0), x_dir=(1, 0, 0), z_dir=(0, 1, 0))):
        with Locations(Location((-1.83388, -60.19546, 0), (0, 0, 270))):
            Circle(SKETCH99_R)
    extrude(amount=-CUT_EXTRUDE50_DEPTH, mode=Mode.SUBTRACT)

    # Fillet5
    fillet5_edges = [part.edges().sort_by_distance(p)[0] for p in [
        (26.522246674, 27.1145, 135.853654954),
        (14.966768676, 27.1145, 141.097),
        (-14.966768676, 27.1145, 141.097),
        (-26.522246674, 27.1145, 135.853654954),
        (-44.392192993, 27.1145, 104.902),
        (-26.522246674, 27.1145, 73.950345046),
        (-14.966768676, 27.1145, 68.707),
        (14.966768676, 27.1145, 68.707),
        (26.522246674, 27.1145, 73.950345046),
        (44.392192993, 27.1145, 104.902),
    ]]
    fillet(fillet5_edges, radius=FILLET5_R)

    # Fillet6
    # the kernel refuses this fillet: 2.54 mm, written as the material it takes off along each edge
    with BuildSketch(Plane(origin=(-92.075, 23.994075516, 63.666679691), x_dir=(1, 0, 0), z_dir=(0, 1, 0))) as fillet6_piece_1:
        with BuildLine():
            CenterArc((2.055088799, -2.055088799), FILLET6_R, 125.992875358, 18.014249284)
            Line((0, -0.562369794), (0, 0))
            Line((0, 0), (0.562369794, 0))
        make_face()
    extrude(amount=6.240848968, mode=Mode.SUBTRACT)

    # Fillet7
    fillet7_edges = [part.edges().sort_by_distance(p)[0] for p in [
        (-56.717655593, 27.1145, 63.666679691),
        (-17.069279245, 27.1145, 42.712517997),
        (-10.14345794, 27.1145, 37.398148396),
        (55.993026154, 27.1145, 34.960960278),
        (62.918847459, 27.1145, 40.275329879),
        (-48.171509306, 27.1145, 63.291632816),
        (29.140093826, 27.1145, 14.355980596),
        (86.879538977, 27.1145, 58.661015131),
        (17.141153982, 27.1145, 16.068474264),
        (10.970662446, 27.1145, 21.196713997),
        (51.762739264, 27.1145, 31.71494698),
        (45.098364606, 27.1145, 26.601192447),
        (-41.268255068, 27.1145, 60.88759018),
        (-34.71771514, 27.1145, 56.254639155),
        (-83.112369794, 27.1145, 63.666679691),
        (-104.665014774, 27.1145, 77.967186106),
        (104.665014774, 27.1145, 77.967186106),
    ]]
    fillet(fillet7_edges, radius=FILLET7_R)

    # Fillet8
    fillet8_edges = [part.edges().sort_by_distance(p)[0] for p in [
        (19.785658887, 27.1145, 12.670545663),
    ]]
    fillet(fillet8_edges, radius=FILLET8_R)

    # Fillet42
    fillet42_edges = [part.edges().sort_by_distance(p)[0] for p in [
        (-93.637892076, 27.1145, 67.870686106),
        (92.974659151, 27.1145, 67.870686106),
    ]]
    fillet(fillet42_edges, radius=FILLET42_R)


solid = part.part
